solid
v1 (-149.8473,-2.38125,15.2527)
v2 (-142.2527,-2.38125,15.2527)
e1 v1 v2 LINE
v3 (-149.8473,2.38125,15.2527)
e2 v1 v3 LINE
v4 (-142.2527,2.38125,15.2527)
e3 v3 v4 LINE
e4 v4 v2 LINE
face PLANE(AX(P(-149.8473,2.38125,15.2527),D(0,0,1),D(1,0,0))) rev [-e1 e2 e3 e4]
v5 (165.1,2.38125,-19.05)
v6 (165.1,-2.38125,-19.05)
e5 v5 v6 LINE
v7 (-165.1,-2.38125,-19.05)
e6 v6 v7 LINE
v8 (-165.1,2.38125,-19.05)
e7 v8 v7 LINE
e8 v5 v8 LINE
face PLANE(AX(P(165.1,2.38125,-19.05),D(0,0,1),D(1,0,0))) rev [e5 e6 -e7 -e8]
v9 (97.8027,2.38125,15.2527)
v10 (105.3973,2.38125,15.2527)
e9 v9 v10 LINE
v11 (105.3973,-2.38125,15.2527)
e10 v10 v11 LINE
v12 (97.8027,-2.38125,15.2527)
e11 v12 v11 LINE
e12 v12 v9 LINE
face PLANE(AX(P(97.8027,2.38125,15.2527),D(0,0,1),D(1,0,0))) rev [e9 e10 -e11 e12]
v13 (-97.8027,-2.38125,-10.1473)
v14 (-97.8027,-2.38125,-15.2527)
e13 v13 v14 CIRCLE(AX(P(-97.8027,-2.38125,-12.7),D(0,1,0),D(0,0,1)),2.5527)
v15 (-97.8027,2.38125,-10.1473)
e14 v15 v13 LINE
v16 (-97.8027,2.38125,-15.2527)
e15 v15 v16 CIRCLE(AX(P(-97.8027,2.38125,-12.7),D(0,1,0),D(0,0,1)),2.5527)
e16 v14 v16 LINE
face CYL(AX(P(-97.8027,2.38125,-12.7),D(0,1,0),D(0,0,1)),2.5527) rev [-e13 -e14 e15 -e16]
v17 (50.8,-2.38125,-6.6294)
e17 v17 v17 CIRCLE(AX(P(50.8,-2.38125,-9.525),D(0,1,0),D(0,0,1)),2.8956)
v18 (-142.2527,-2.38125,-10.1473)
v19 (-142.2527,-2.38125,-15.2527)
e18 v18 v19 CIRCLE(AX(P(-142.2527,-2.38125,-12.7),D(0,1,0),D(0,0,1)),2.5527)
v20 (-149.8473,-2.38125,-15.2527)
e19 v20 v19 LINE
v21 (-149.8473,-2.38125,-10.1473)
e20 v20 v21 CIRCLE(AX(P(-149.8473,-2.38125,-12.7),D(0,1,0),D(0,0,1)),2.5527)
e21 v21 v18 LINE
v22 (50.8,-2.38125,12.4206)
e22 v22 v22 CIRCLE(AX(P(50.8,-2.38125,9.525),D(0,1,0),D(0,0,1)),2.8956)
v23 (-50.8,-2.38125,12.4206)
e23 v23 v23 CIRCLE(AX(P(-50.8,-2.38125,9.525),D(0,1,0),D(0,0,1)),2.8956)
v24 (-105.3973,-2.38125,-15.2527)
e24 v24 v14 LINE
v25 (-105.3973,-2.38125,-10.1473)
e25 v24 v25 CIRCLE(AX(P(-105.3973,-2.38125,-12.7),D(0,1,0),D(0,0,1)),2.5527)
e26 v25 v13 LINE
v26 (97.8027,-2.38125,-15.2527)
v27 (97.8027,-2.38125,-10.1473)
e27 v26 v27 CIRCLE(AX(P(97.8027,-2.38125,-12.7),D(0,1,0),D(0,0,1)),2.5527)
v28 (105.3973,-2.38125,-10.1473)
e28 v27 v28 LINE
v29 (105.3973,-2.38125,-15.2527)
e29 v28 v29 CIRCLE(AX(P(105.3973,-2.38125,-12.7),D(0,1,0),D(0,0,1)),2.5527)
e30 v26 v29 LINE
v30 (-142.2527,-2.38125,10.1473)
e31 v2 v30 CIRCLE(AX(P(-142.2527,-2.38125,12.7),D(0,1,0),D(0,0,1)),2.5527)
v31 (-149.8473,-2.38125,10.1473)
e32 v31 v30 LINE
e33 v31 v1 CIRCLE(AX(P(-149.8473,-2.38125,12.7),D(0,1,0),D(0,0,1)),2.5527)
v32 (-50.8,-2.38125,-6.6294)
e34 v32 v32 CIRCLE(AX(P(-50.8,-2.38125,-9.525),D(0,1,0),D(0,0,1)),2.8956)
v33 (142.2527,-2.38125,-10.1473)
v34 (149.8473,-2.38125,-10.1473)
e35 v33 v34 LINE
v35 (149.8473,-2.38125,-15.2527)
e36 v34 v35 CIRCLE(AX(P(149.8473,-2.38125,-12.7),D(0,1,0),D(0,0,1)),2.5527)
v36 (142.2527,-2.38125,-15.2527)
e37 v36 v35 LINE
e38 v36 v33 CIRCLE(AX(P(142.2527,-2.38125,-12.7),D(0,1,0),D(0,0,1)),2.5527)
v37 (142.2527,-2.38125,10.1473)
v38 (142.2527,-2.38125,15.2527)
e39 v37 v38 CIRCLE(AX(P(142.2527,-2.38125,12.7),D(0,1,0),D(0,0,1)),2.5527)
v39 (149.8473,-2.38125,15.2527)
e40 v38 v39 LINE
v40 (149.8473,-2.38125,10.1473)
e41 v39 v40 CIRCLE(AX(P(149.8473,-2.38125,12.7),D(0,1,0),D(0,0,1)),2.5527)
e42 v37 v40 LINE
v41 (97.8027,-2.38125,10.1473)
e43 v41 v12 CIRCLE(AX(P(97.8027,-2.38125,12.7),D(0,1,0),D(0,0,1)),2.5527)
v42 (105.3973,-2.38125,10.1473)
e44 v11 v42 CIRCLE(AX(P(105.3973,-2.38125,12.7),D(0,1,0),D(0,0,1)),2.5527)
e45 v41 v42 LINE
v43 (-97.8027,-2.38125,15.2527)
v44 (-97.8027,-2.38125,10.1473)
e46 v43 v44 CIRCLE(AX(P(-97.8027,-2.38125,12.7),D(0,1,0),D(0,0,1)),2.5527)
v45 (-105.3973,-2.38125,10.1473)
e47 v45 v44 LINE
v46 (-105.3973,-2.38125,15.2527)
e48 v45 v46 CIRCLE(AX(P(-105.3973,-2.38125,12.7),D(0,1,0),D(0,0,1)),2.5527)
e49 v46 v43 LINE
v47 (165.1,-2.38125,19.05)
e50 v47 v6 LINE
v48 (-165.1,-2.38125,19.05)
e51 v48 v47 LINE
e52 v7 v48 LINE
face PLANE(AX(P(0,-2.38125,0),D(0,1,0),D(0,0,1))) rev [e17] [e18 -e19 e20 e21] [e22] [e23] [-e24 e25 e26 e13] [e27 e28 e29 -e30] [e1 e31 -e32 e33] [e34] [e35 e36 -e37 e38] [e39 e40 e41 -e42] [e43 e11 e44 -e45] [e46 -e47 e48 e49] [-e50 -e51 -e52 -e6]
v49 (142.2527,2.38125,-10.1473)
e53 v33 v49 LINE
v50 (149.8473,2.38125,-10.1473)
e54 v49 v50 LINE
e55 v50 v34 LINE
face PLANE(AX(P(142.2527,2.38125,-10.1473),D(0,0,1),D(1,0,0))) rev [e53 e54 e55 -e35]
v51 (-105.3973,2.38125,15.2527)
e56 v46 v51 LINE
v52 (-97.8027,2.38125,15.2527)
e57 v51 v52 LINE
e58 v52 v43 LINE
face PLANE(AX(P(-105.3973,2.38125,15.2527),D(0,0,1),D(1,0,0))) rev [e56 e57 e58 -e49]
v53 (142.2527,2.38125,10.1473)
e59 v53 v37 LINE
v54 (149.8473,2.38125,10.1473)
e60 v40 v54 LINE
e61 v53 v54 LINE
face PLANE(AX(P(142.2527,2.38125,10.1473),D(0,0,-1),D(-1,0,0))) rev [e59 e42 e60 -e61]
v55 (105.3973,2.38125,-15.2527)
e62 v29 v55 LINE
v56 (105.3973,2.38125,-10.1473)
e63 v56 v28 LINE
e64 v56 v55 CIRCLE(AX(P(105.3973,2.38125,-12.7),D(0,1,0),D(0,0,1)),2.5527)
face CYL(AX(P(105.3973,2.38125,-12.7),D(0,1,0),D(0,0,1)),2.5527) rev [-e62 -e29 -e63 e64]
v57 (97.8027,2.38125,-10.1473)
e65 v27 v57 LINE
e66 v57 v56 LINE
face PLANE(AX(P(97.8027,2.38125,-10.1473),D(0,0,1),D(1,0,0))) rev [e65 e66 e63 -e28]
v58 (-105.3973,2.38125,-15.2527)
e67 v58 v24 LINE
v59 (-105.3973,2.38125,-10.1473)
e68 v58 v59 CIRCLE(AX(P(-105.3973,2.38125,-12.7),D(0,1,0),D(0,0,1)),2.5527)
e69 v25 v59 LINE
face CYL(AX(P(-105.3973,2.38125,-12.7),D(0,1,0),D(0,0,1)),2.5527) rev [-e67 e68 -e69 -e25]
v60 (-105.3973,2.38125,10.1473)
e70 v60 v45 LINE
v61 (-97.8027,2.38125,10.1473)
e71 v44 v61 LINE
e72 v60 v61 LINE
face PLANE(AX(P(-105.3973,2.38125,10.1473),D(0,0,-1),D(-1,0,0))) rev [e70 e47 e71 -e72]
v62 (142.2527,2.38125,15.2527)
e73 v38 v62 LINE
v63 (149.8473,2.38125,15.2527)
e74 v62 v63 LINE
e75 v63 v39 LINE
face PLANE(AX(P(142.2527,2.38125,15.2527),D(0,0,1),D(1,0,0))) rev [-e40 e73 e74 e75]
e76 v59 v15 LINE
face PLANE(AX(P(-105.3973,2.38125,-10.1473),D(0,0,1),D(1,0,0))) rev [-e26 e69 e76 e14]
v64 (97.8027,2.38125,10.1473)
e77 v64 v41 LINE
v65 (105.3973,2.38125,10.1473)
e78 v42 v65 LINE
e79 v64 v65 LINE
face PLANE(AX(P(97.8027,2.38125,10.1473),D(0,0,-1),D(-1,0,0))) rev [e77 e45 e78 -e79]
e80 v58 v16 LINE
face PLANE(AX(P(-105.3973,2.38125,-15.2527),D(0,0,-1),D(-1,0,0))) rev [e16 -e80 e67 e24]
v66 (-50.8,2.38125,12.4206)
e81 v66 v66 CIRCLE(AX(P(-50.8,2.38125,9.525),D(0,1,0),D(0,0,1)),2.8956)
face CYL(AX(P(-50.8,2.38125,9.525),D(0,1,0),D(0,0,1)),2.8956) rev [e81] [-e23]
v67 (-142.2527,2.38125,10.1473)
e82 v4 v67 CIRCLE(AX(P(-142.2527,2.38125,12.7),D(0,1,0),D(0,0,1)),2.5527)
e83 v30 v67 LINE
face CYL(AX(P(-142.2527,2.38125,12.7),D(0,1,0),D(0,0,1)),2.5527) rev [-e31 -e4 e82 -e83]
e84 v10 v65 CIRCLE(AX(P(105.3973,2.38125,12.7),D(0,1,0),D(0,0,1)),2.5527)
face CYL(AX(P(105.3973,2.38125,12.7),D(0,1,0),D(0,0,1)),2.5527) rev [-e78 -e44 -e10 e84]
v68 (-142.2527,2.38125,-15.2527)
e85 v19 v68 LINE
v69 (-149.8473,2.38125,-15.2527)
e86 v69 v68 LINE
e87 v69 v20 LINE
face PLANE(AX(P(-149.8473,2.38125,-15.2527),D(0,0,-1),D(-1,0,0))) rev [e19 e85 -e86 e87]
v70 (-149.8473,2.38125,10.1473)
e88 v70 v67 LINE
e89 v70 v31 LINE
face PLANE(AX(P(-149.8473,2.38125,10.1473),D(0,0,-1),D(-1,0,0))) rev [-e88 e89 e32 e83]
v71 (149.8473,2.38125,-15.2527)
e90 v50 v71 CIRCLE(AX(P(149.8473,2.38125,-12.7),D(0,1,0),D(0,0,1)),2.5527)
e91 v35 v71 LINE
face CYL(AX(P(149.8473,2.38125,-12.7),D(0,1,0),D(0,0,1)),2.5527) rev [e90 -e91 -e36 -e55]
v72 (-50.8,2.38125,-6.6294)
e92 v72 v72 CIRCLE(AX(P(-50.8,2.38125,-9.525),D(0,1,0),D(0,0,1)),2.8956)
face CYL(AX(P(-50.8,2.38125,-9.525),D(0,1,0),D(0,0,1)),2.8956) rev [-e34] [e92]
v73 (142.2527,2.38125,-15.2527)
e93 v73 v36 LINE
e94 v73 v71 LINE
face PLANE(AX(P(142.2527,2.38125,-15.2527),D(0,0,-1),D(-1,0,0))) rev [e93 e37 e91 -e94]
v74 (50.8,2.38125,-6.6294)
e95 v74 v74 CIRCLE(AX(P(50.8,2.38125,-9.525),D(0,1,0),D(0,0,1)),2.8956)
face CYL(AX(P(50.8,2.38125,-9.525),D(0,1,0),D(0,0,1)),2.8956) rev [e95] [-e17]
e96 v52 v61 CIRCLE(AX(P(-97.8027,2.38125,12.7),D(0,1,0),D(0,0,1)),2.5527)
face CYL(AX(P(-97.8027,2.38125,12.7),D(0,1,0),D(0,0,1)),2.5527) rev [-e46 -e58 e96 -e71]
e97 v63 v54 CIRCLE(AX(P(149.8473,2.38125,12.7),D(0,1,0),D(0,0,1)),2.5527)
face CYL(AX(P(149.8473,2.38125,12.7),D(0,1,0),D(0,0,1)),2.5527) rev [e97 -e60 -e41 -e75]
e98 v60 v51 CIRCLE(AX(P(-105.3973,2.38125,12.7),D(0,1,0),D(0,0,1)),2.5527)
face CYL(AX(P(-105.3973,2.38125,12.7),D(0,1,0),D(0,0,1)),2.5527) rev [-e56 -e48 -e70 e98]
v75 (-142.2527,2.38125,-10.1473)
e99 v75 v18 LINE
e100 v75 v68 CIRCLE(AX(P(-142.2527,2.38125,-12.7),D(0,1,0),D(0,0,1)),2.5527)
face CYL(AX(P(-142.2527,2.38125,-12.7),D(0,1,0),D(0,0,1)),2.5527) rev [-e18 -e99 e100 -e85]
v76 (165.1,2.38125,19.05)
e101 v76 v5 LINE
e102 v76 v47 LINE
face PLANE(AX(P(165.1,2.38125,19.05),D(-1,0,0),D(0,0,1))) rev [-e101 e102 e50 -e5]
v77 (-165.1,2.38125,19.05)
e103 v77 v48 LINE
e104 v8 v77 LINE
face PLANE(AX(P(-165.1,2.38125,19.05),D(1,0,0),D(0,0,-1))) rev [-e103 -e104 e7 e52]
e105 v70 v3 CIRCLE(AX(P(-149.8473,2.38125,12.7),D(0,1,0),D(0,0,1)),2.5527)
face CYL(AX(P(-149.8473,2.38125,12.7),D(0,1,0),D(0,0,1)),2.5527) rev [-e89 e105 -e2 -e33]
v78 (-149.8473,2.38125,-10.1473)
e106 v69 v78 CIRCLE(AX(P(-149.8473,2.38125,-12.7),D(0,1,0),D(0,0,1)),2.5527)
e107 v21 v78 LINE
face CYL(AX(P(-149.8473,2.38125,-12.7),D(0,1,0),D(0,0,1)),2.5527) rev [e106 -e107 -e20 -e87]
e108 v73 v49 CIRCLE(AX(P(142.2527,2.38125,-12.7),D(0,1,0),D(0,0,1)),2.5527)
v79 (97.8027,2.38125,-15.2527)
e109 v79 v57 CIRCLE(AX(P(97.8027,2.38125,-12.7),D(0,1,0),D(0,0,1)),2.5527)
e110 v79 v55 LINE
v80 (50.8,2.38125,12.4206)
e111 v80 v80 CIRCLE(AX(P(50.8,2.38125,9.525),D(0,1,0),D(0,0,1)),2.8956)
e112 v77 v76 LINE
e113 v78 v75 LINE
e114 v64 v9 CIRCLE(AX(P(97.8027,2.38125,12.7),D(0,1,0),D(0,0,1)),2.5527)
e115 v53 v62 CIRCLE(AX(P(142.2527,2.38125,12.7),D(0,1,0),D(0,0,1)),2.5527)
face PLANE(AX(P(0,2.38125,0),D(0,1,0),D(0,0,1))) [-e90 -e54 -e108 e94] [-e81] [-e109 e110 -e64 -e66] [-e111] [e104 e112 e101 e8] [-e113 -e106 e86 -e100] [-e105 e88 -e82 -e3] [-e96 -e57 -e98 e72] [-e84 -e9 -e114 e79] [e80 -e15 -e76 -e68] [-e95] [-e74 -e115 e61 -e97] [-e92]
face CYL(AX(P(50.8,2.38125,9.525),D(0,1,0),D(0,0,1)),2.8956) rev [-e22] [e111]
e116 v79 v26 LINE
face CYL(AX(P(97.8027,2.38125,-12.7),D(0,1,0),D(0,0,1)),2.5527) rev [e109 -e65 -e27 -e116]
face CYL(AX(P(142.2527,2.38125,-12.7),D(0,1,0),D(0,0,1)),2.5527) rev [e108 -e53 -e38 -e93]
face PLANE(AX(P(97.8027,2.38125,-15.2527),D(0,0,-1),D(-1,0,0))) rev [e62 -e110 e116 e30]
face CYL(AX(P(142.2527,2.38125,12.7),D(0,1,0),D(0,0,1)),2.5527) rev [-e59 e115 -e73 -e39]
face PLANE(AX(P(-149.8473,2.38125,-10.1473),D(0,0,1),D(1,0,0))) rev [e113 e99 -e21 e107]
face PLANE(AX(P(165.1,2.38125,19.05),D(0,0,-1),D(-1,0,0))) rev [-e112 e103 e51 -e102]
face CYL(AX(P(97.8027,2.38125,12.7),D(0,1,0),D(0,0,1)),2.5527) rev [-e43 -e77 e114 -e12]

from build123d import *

# Parameters (mm, degrees)
SKETCH1_W                  = 330.2
SKETCH1_H                  = 38.1
BOSS_EXTRUDE1_DEPTH        = 2.38125
F_10_START                 = -2.38125
F_10_CLEARANCE_SLOT1_DEPTH = 4.7625
F_1_4_20_TAPPED_HOLE1_D    = 5.7912


# Read off the part's stored shape, not the designer's step: #10 Clearance Slot1
with BuildPart() as part:
    # Sketch1 → Boss-Extrude1 (new, symmetric)
    with BuildSketch(Plane(origin=(0, 0, 0), x_dir=(1, 0, 0), z_dir=(0, 1, 0))):
        Rectangle(SKETCH1_W, SKETCH1_H)
    extrude(amount=BOSS_EXTRUDE1_DEPTH, both=True)

    # #10 Clearance Slot1 outline → #10 Clearance Slot1 (cut)
    with BuildSketch(Plane(origin=(0, 0, 0), x_dir=(1, 0, 0), z_dir=(0, 1, 0)).offset(F_10_START)):
        with BuildLine():
            Line((142.2527, 10.1473), (149.8473, 10.1473))
            ThreePointArc((149.8473, 10.1473), (152.4, 12.7), (149.8473, 15.2527))
            Line((149.8473, 15.2527), (142.2527, 15.2527))
            ThreePointArc((142.2527, 15.2527), (139.7, 12.7), (142.2527, 10.1473))
        make_face()
        with BuildLine():
            ThreePointArc((105.3973, 10.1473), (107.95, 12.7), (105.3973, 15.2527))
            Line((105.3973, 15.2527), (97.8027, 15.2527))
            ThreePointArc((97.8027, 15.2527), (95.25, 12.7), (97.8027, 10.1473))
            Line((97.8027, 10.1473), (105.3973, 10.1473))
        make_face()
        with BuildLine():
            ThreePointArc((-142.2527, 10.1473), (-139.7, 12.7), (-142.2527, 15.2527))
            Line((-142.2527, 15.2527), (-149.8473, 15.2527))
            ThreePointArc((-149.8473, 15.2527), (-152.4, 12.7), (-149.8473, 10.1473))
            Line((-149.8473, 10.1473), (-142.2527, 10.1473))
        make_face()
        with BuildLine():
            ThreePointArc((-97.8027, 10.1473), (-95.25, 12.7), (-97.8027, 15.2527))
            Line((-97.8027, 15.2527), (-105.3973, 15.2527))
            ThreePointArc((-105.3973, 15.2527), (-107.95, 12.7), (-105.3973, 10.1473))
            Line((-105.3973, 10.1473), (-97.8027, 10.1473))
        make_face()
        with BuildLine():
            Line((142.2527, -15.2527), (149.8473, -15.2527))
            ThreePointArc((149.8473, -15.2527), (152.4, -12.7), (149.8473, -10.1473))
            Line((149.8473, -10.1473), (142.2527, -10.1473))
            ThreePointArc((142.2527, -10.1473), (139.7, -12.7), (142.2527, -15.2527))
        make_face()
        with BuildLine():
            ThreePointArc((105.3973, -15.2527), (107.95, -12.7), (105.3973, -10.1473))
            Line((105.3973, -10.1473), (97.8027, -10.1473))
            ThreePointArc((97.8027, -10.1473), (95.25, -12.7), (97.8027, -15.2527))
            Line((97.8027, -15.2527), (105.3973, -15.2527))
        make_face()
        with BuildLine():
            ThreePointArc((-97.8027, -15.2527), (-95.25, -12.7), (-97.8027, -10.1473))
            Line((-97.8027, -10.1473), (-105.3973, -10.1473))
            ThreePointArc((-105.3973, -10.1473), (-107.95, -12.7), (-105.3973, -15.2527))
            Line((-105.3973, -15.2527), (-97.8027, -15.2527))
        make_face()
        with BuildLine():
            ThreePointArc((-142.2527, -15.2527), (-139.7, -12.7), (-142.2527, -10.1473))
            Line((-142.2527, -10.1473), (-149.8473, -10.1473))
            ThreePointArc((-149.8473, -10.1473), (-152.4, -12.7), (-149.8473, -15.2527))
            Line((-149.8473, -15.2527), (-142.2527, -15.2527))
        make_face()
    extrude(amount=F_10_CLEARANCE_SLOT1_DEPTH, mode=Mode.SUBTRACT)

    # 1/4-20 Tapped Hole1 (through all)
    with Locations(Plane(origin=(0, 2.38125, 0), x_dir=(1, 0, 0), z_dir=(0, 1, 0))):
        with Locations((-50.8, 9.525), (-50.8, -9.525), (50.8, -9.525), (50.8, 9.525)):
            Hole(F_1_4_20_TAPPED_HOLE1_D / 2)


solid = part.part
